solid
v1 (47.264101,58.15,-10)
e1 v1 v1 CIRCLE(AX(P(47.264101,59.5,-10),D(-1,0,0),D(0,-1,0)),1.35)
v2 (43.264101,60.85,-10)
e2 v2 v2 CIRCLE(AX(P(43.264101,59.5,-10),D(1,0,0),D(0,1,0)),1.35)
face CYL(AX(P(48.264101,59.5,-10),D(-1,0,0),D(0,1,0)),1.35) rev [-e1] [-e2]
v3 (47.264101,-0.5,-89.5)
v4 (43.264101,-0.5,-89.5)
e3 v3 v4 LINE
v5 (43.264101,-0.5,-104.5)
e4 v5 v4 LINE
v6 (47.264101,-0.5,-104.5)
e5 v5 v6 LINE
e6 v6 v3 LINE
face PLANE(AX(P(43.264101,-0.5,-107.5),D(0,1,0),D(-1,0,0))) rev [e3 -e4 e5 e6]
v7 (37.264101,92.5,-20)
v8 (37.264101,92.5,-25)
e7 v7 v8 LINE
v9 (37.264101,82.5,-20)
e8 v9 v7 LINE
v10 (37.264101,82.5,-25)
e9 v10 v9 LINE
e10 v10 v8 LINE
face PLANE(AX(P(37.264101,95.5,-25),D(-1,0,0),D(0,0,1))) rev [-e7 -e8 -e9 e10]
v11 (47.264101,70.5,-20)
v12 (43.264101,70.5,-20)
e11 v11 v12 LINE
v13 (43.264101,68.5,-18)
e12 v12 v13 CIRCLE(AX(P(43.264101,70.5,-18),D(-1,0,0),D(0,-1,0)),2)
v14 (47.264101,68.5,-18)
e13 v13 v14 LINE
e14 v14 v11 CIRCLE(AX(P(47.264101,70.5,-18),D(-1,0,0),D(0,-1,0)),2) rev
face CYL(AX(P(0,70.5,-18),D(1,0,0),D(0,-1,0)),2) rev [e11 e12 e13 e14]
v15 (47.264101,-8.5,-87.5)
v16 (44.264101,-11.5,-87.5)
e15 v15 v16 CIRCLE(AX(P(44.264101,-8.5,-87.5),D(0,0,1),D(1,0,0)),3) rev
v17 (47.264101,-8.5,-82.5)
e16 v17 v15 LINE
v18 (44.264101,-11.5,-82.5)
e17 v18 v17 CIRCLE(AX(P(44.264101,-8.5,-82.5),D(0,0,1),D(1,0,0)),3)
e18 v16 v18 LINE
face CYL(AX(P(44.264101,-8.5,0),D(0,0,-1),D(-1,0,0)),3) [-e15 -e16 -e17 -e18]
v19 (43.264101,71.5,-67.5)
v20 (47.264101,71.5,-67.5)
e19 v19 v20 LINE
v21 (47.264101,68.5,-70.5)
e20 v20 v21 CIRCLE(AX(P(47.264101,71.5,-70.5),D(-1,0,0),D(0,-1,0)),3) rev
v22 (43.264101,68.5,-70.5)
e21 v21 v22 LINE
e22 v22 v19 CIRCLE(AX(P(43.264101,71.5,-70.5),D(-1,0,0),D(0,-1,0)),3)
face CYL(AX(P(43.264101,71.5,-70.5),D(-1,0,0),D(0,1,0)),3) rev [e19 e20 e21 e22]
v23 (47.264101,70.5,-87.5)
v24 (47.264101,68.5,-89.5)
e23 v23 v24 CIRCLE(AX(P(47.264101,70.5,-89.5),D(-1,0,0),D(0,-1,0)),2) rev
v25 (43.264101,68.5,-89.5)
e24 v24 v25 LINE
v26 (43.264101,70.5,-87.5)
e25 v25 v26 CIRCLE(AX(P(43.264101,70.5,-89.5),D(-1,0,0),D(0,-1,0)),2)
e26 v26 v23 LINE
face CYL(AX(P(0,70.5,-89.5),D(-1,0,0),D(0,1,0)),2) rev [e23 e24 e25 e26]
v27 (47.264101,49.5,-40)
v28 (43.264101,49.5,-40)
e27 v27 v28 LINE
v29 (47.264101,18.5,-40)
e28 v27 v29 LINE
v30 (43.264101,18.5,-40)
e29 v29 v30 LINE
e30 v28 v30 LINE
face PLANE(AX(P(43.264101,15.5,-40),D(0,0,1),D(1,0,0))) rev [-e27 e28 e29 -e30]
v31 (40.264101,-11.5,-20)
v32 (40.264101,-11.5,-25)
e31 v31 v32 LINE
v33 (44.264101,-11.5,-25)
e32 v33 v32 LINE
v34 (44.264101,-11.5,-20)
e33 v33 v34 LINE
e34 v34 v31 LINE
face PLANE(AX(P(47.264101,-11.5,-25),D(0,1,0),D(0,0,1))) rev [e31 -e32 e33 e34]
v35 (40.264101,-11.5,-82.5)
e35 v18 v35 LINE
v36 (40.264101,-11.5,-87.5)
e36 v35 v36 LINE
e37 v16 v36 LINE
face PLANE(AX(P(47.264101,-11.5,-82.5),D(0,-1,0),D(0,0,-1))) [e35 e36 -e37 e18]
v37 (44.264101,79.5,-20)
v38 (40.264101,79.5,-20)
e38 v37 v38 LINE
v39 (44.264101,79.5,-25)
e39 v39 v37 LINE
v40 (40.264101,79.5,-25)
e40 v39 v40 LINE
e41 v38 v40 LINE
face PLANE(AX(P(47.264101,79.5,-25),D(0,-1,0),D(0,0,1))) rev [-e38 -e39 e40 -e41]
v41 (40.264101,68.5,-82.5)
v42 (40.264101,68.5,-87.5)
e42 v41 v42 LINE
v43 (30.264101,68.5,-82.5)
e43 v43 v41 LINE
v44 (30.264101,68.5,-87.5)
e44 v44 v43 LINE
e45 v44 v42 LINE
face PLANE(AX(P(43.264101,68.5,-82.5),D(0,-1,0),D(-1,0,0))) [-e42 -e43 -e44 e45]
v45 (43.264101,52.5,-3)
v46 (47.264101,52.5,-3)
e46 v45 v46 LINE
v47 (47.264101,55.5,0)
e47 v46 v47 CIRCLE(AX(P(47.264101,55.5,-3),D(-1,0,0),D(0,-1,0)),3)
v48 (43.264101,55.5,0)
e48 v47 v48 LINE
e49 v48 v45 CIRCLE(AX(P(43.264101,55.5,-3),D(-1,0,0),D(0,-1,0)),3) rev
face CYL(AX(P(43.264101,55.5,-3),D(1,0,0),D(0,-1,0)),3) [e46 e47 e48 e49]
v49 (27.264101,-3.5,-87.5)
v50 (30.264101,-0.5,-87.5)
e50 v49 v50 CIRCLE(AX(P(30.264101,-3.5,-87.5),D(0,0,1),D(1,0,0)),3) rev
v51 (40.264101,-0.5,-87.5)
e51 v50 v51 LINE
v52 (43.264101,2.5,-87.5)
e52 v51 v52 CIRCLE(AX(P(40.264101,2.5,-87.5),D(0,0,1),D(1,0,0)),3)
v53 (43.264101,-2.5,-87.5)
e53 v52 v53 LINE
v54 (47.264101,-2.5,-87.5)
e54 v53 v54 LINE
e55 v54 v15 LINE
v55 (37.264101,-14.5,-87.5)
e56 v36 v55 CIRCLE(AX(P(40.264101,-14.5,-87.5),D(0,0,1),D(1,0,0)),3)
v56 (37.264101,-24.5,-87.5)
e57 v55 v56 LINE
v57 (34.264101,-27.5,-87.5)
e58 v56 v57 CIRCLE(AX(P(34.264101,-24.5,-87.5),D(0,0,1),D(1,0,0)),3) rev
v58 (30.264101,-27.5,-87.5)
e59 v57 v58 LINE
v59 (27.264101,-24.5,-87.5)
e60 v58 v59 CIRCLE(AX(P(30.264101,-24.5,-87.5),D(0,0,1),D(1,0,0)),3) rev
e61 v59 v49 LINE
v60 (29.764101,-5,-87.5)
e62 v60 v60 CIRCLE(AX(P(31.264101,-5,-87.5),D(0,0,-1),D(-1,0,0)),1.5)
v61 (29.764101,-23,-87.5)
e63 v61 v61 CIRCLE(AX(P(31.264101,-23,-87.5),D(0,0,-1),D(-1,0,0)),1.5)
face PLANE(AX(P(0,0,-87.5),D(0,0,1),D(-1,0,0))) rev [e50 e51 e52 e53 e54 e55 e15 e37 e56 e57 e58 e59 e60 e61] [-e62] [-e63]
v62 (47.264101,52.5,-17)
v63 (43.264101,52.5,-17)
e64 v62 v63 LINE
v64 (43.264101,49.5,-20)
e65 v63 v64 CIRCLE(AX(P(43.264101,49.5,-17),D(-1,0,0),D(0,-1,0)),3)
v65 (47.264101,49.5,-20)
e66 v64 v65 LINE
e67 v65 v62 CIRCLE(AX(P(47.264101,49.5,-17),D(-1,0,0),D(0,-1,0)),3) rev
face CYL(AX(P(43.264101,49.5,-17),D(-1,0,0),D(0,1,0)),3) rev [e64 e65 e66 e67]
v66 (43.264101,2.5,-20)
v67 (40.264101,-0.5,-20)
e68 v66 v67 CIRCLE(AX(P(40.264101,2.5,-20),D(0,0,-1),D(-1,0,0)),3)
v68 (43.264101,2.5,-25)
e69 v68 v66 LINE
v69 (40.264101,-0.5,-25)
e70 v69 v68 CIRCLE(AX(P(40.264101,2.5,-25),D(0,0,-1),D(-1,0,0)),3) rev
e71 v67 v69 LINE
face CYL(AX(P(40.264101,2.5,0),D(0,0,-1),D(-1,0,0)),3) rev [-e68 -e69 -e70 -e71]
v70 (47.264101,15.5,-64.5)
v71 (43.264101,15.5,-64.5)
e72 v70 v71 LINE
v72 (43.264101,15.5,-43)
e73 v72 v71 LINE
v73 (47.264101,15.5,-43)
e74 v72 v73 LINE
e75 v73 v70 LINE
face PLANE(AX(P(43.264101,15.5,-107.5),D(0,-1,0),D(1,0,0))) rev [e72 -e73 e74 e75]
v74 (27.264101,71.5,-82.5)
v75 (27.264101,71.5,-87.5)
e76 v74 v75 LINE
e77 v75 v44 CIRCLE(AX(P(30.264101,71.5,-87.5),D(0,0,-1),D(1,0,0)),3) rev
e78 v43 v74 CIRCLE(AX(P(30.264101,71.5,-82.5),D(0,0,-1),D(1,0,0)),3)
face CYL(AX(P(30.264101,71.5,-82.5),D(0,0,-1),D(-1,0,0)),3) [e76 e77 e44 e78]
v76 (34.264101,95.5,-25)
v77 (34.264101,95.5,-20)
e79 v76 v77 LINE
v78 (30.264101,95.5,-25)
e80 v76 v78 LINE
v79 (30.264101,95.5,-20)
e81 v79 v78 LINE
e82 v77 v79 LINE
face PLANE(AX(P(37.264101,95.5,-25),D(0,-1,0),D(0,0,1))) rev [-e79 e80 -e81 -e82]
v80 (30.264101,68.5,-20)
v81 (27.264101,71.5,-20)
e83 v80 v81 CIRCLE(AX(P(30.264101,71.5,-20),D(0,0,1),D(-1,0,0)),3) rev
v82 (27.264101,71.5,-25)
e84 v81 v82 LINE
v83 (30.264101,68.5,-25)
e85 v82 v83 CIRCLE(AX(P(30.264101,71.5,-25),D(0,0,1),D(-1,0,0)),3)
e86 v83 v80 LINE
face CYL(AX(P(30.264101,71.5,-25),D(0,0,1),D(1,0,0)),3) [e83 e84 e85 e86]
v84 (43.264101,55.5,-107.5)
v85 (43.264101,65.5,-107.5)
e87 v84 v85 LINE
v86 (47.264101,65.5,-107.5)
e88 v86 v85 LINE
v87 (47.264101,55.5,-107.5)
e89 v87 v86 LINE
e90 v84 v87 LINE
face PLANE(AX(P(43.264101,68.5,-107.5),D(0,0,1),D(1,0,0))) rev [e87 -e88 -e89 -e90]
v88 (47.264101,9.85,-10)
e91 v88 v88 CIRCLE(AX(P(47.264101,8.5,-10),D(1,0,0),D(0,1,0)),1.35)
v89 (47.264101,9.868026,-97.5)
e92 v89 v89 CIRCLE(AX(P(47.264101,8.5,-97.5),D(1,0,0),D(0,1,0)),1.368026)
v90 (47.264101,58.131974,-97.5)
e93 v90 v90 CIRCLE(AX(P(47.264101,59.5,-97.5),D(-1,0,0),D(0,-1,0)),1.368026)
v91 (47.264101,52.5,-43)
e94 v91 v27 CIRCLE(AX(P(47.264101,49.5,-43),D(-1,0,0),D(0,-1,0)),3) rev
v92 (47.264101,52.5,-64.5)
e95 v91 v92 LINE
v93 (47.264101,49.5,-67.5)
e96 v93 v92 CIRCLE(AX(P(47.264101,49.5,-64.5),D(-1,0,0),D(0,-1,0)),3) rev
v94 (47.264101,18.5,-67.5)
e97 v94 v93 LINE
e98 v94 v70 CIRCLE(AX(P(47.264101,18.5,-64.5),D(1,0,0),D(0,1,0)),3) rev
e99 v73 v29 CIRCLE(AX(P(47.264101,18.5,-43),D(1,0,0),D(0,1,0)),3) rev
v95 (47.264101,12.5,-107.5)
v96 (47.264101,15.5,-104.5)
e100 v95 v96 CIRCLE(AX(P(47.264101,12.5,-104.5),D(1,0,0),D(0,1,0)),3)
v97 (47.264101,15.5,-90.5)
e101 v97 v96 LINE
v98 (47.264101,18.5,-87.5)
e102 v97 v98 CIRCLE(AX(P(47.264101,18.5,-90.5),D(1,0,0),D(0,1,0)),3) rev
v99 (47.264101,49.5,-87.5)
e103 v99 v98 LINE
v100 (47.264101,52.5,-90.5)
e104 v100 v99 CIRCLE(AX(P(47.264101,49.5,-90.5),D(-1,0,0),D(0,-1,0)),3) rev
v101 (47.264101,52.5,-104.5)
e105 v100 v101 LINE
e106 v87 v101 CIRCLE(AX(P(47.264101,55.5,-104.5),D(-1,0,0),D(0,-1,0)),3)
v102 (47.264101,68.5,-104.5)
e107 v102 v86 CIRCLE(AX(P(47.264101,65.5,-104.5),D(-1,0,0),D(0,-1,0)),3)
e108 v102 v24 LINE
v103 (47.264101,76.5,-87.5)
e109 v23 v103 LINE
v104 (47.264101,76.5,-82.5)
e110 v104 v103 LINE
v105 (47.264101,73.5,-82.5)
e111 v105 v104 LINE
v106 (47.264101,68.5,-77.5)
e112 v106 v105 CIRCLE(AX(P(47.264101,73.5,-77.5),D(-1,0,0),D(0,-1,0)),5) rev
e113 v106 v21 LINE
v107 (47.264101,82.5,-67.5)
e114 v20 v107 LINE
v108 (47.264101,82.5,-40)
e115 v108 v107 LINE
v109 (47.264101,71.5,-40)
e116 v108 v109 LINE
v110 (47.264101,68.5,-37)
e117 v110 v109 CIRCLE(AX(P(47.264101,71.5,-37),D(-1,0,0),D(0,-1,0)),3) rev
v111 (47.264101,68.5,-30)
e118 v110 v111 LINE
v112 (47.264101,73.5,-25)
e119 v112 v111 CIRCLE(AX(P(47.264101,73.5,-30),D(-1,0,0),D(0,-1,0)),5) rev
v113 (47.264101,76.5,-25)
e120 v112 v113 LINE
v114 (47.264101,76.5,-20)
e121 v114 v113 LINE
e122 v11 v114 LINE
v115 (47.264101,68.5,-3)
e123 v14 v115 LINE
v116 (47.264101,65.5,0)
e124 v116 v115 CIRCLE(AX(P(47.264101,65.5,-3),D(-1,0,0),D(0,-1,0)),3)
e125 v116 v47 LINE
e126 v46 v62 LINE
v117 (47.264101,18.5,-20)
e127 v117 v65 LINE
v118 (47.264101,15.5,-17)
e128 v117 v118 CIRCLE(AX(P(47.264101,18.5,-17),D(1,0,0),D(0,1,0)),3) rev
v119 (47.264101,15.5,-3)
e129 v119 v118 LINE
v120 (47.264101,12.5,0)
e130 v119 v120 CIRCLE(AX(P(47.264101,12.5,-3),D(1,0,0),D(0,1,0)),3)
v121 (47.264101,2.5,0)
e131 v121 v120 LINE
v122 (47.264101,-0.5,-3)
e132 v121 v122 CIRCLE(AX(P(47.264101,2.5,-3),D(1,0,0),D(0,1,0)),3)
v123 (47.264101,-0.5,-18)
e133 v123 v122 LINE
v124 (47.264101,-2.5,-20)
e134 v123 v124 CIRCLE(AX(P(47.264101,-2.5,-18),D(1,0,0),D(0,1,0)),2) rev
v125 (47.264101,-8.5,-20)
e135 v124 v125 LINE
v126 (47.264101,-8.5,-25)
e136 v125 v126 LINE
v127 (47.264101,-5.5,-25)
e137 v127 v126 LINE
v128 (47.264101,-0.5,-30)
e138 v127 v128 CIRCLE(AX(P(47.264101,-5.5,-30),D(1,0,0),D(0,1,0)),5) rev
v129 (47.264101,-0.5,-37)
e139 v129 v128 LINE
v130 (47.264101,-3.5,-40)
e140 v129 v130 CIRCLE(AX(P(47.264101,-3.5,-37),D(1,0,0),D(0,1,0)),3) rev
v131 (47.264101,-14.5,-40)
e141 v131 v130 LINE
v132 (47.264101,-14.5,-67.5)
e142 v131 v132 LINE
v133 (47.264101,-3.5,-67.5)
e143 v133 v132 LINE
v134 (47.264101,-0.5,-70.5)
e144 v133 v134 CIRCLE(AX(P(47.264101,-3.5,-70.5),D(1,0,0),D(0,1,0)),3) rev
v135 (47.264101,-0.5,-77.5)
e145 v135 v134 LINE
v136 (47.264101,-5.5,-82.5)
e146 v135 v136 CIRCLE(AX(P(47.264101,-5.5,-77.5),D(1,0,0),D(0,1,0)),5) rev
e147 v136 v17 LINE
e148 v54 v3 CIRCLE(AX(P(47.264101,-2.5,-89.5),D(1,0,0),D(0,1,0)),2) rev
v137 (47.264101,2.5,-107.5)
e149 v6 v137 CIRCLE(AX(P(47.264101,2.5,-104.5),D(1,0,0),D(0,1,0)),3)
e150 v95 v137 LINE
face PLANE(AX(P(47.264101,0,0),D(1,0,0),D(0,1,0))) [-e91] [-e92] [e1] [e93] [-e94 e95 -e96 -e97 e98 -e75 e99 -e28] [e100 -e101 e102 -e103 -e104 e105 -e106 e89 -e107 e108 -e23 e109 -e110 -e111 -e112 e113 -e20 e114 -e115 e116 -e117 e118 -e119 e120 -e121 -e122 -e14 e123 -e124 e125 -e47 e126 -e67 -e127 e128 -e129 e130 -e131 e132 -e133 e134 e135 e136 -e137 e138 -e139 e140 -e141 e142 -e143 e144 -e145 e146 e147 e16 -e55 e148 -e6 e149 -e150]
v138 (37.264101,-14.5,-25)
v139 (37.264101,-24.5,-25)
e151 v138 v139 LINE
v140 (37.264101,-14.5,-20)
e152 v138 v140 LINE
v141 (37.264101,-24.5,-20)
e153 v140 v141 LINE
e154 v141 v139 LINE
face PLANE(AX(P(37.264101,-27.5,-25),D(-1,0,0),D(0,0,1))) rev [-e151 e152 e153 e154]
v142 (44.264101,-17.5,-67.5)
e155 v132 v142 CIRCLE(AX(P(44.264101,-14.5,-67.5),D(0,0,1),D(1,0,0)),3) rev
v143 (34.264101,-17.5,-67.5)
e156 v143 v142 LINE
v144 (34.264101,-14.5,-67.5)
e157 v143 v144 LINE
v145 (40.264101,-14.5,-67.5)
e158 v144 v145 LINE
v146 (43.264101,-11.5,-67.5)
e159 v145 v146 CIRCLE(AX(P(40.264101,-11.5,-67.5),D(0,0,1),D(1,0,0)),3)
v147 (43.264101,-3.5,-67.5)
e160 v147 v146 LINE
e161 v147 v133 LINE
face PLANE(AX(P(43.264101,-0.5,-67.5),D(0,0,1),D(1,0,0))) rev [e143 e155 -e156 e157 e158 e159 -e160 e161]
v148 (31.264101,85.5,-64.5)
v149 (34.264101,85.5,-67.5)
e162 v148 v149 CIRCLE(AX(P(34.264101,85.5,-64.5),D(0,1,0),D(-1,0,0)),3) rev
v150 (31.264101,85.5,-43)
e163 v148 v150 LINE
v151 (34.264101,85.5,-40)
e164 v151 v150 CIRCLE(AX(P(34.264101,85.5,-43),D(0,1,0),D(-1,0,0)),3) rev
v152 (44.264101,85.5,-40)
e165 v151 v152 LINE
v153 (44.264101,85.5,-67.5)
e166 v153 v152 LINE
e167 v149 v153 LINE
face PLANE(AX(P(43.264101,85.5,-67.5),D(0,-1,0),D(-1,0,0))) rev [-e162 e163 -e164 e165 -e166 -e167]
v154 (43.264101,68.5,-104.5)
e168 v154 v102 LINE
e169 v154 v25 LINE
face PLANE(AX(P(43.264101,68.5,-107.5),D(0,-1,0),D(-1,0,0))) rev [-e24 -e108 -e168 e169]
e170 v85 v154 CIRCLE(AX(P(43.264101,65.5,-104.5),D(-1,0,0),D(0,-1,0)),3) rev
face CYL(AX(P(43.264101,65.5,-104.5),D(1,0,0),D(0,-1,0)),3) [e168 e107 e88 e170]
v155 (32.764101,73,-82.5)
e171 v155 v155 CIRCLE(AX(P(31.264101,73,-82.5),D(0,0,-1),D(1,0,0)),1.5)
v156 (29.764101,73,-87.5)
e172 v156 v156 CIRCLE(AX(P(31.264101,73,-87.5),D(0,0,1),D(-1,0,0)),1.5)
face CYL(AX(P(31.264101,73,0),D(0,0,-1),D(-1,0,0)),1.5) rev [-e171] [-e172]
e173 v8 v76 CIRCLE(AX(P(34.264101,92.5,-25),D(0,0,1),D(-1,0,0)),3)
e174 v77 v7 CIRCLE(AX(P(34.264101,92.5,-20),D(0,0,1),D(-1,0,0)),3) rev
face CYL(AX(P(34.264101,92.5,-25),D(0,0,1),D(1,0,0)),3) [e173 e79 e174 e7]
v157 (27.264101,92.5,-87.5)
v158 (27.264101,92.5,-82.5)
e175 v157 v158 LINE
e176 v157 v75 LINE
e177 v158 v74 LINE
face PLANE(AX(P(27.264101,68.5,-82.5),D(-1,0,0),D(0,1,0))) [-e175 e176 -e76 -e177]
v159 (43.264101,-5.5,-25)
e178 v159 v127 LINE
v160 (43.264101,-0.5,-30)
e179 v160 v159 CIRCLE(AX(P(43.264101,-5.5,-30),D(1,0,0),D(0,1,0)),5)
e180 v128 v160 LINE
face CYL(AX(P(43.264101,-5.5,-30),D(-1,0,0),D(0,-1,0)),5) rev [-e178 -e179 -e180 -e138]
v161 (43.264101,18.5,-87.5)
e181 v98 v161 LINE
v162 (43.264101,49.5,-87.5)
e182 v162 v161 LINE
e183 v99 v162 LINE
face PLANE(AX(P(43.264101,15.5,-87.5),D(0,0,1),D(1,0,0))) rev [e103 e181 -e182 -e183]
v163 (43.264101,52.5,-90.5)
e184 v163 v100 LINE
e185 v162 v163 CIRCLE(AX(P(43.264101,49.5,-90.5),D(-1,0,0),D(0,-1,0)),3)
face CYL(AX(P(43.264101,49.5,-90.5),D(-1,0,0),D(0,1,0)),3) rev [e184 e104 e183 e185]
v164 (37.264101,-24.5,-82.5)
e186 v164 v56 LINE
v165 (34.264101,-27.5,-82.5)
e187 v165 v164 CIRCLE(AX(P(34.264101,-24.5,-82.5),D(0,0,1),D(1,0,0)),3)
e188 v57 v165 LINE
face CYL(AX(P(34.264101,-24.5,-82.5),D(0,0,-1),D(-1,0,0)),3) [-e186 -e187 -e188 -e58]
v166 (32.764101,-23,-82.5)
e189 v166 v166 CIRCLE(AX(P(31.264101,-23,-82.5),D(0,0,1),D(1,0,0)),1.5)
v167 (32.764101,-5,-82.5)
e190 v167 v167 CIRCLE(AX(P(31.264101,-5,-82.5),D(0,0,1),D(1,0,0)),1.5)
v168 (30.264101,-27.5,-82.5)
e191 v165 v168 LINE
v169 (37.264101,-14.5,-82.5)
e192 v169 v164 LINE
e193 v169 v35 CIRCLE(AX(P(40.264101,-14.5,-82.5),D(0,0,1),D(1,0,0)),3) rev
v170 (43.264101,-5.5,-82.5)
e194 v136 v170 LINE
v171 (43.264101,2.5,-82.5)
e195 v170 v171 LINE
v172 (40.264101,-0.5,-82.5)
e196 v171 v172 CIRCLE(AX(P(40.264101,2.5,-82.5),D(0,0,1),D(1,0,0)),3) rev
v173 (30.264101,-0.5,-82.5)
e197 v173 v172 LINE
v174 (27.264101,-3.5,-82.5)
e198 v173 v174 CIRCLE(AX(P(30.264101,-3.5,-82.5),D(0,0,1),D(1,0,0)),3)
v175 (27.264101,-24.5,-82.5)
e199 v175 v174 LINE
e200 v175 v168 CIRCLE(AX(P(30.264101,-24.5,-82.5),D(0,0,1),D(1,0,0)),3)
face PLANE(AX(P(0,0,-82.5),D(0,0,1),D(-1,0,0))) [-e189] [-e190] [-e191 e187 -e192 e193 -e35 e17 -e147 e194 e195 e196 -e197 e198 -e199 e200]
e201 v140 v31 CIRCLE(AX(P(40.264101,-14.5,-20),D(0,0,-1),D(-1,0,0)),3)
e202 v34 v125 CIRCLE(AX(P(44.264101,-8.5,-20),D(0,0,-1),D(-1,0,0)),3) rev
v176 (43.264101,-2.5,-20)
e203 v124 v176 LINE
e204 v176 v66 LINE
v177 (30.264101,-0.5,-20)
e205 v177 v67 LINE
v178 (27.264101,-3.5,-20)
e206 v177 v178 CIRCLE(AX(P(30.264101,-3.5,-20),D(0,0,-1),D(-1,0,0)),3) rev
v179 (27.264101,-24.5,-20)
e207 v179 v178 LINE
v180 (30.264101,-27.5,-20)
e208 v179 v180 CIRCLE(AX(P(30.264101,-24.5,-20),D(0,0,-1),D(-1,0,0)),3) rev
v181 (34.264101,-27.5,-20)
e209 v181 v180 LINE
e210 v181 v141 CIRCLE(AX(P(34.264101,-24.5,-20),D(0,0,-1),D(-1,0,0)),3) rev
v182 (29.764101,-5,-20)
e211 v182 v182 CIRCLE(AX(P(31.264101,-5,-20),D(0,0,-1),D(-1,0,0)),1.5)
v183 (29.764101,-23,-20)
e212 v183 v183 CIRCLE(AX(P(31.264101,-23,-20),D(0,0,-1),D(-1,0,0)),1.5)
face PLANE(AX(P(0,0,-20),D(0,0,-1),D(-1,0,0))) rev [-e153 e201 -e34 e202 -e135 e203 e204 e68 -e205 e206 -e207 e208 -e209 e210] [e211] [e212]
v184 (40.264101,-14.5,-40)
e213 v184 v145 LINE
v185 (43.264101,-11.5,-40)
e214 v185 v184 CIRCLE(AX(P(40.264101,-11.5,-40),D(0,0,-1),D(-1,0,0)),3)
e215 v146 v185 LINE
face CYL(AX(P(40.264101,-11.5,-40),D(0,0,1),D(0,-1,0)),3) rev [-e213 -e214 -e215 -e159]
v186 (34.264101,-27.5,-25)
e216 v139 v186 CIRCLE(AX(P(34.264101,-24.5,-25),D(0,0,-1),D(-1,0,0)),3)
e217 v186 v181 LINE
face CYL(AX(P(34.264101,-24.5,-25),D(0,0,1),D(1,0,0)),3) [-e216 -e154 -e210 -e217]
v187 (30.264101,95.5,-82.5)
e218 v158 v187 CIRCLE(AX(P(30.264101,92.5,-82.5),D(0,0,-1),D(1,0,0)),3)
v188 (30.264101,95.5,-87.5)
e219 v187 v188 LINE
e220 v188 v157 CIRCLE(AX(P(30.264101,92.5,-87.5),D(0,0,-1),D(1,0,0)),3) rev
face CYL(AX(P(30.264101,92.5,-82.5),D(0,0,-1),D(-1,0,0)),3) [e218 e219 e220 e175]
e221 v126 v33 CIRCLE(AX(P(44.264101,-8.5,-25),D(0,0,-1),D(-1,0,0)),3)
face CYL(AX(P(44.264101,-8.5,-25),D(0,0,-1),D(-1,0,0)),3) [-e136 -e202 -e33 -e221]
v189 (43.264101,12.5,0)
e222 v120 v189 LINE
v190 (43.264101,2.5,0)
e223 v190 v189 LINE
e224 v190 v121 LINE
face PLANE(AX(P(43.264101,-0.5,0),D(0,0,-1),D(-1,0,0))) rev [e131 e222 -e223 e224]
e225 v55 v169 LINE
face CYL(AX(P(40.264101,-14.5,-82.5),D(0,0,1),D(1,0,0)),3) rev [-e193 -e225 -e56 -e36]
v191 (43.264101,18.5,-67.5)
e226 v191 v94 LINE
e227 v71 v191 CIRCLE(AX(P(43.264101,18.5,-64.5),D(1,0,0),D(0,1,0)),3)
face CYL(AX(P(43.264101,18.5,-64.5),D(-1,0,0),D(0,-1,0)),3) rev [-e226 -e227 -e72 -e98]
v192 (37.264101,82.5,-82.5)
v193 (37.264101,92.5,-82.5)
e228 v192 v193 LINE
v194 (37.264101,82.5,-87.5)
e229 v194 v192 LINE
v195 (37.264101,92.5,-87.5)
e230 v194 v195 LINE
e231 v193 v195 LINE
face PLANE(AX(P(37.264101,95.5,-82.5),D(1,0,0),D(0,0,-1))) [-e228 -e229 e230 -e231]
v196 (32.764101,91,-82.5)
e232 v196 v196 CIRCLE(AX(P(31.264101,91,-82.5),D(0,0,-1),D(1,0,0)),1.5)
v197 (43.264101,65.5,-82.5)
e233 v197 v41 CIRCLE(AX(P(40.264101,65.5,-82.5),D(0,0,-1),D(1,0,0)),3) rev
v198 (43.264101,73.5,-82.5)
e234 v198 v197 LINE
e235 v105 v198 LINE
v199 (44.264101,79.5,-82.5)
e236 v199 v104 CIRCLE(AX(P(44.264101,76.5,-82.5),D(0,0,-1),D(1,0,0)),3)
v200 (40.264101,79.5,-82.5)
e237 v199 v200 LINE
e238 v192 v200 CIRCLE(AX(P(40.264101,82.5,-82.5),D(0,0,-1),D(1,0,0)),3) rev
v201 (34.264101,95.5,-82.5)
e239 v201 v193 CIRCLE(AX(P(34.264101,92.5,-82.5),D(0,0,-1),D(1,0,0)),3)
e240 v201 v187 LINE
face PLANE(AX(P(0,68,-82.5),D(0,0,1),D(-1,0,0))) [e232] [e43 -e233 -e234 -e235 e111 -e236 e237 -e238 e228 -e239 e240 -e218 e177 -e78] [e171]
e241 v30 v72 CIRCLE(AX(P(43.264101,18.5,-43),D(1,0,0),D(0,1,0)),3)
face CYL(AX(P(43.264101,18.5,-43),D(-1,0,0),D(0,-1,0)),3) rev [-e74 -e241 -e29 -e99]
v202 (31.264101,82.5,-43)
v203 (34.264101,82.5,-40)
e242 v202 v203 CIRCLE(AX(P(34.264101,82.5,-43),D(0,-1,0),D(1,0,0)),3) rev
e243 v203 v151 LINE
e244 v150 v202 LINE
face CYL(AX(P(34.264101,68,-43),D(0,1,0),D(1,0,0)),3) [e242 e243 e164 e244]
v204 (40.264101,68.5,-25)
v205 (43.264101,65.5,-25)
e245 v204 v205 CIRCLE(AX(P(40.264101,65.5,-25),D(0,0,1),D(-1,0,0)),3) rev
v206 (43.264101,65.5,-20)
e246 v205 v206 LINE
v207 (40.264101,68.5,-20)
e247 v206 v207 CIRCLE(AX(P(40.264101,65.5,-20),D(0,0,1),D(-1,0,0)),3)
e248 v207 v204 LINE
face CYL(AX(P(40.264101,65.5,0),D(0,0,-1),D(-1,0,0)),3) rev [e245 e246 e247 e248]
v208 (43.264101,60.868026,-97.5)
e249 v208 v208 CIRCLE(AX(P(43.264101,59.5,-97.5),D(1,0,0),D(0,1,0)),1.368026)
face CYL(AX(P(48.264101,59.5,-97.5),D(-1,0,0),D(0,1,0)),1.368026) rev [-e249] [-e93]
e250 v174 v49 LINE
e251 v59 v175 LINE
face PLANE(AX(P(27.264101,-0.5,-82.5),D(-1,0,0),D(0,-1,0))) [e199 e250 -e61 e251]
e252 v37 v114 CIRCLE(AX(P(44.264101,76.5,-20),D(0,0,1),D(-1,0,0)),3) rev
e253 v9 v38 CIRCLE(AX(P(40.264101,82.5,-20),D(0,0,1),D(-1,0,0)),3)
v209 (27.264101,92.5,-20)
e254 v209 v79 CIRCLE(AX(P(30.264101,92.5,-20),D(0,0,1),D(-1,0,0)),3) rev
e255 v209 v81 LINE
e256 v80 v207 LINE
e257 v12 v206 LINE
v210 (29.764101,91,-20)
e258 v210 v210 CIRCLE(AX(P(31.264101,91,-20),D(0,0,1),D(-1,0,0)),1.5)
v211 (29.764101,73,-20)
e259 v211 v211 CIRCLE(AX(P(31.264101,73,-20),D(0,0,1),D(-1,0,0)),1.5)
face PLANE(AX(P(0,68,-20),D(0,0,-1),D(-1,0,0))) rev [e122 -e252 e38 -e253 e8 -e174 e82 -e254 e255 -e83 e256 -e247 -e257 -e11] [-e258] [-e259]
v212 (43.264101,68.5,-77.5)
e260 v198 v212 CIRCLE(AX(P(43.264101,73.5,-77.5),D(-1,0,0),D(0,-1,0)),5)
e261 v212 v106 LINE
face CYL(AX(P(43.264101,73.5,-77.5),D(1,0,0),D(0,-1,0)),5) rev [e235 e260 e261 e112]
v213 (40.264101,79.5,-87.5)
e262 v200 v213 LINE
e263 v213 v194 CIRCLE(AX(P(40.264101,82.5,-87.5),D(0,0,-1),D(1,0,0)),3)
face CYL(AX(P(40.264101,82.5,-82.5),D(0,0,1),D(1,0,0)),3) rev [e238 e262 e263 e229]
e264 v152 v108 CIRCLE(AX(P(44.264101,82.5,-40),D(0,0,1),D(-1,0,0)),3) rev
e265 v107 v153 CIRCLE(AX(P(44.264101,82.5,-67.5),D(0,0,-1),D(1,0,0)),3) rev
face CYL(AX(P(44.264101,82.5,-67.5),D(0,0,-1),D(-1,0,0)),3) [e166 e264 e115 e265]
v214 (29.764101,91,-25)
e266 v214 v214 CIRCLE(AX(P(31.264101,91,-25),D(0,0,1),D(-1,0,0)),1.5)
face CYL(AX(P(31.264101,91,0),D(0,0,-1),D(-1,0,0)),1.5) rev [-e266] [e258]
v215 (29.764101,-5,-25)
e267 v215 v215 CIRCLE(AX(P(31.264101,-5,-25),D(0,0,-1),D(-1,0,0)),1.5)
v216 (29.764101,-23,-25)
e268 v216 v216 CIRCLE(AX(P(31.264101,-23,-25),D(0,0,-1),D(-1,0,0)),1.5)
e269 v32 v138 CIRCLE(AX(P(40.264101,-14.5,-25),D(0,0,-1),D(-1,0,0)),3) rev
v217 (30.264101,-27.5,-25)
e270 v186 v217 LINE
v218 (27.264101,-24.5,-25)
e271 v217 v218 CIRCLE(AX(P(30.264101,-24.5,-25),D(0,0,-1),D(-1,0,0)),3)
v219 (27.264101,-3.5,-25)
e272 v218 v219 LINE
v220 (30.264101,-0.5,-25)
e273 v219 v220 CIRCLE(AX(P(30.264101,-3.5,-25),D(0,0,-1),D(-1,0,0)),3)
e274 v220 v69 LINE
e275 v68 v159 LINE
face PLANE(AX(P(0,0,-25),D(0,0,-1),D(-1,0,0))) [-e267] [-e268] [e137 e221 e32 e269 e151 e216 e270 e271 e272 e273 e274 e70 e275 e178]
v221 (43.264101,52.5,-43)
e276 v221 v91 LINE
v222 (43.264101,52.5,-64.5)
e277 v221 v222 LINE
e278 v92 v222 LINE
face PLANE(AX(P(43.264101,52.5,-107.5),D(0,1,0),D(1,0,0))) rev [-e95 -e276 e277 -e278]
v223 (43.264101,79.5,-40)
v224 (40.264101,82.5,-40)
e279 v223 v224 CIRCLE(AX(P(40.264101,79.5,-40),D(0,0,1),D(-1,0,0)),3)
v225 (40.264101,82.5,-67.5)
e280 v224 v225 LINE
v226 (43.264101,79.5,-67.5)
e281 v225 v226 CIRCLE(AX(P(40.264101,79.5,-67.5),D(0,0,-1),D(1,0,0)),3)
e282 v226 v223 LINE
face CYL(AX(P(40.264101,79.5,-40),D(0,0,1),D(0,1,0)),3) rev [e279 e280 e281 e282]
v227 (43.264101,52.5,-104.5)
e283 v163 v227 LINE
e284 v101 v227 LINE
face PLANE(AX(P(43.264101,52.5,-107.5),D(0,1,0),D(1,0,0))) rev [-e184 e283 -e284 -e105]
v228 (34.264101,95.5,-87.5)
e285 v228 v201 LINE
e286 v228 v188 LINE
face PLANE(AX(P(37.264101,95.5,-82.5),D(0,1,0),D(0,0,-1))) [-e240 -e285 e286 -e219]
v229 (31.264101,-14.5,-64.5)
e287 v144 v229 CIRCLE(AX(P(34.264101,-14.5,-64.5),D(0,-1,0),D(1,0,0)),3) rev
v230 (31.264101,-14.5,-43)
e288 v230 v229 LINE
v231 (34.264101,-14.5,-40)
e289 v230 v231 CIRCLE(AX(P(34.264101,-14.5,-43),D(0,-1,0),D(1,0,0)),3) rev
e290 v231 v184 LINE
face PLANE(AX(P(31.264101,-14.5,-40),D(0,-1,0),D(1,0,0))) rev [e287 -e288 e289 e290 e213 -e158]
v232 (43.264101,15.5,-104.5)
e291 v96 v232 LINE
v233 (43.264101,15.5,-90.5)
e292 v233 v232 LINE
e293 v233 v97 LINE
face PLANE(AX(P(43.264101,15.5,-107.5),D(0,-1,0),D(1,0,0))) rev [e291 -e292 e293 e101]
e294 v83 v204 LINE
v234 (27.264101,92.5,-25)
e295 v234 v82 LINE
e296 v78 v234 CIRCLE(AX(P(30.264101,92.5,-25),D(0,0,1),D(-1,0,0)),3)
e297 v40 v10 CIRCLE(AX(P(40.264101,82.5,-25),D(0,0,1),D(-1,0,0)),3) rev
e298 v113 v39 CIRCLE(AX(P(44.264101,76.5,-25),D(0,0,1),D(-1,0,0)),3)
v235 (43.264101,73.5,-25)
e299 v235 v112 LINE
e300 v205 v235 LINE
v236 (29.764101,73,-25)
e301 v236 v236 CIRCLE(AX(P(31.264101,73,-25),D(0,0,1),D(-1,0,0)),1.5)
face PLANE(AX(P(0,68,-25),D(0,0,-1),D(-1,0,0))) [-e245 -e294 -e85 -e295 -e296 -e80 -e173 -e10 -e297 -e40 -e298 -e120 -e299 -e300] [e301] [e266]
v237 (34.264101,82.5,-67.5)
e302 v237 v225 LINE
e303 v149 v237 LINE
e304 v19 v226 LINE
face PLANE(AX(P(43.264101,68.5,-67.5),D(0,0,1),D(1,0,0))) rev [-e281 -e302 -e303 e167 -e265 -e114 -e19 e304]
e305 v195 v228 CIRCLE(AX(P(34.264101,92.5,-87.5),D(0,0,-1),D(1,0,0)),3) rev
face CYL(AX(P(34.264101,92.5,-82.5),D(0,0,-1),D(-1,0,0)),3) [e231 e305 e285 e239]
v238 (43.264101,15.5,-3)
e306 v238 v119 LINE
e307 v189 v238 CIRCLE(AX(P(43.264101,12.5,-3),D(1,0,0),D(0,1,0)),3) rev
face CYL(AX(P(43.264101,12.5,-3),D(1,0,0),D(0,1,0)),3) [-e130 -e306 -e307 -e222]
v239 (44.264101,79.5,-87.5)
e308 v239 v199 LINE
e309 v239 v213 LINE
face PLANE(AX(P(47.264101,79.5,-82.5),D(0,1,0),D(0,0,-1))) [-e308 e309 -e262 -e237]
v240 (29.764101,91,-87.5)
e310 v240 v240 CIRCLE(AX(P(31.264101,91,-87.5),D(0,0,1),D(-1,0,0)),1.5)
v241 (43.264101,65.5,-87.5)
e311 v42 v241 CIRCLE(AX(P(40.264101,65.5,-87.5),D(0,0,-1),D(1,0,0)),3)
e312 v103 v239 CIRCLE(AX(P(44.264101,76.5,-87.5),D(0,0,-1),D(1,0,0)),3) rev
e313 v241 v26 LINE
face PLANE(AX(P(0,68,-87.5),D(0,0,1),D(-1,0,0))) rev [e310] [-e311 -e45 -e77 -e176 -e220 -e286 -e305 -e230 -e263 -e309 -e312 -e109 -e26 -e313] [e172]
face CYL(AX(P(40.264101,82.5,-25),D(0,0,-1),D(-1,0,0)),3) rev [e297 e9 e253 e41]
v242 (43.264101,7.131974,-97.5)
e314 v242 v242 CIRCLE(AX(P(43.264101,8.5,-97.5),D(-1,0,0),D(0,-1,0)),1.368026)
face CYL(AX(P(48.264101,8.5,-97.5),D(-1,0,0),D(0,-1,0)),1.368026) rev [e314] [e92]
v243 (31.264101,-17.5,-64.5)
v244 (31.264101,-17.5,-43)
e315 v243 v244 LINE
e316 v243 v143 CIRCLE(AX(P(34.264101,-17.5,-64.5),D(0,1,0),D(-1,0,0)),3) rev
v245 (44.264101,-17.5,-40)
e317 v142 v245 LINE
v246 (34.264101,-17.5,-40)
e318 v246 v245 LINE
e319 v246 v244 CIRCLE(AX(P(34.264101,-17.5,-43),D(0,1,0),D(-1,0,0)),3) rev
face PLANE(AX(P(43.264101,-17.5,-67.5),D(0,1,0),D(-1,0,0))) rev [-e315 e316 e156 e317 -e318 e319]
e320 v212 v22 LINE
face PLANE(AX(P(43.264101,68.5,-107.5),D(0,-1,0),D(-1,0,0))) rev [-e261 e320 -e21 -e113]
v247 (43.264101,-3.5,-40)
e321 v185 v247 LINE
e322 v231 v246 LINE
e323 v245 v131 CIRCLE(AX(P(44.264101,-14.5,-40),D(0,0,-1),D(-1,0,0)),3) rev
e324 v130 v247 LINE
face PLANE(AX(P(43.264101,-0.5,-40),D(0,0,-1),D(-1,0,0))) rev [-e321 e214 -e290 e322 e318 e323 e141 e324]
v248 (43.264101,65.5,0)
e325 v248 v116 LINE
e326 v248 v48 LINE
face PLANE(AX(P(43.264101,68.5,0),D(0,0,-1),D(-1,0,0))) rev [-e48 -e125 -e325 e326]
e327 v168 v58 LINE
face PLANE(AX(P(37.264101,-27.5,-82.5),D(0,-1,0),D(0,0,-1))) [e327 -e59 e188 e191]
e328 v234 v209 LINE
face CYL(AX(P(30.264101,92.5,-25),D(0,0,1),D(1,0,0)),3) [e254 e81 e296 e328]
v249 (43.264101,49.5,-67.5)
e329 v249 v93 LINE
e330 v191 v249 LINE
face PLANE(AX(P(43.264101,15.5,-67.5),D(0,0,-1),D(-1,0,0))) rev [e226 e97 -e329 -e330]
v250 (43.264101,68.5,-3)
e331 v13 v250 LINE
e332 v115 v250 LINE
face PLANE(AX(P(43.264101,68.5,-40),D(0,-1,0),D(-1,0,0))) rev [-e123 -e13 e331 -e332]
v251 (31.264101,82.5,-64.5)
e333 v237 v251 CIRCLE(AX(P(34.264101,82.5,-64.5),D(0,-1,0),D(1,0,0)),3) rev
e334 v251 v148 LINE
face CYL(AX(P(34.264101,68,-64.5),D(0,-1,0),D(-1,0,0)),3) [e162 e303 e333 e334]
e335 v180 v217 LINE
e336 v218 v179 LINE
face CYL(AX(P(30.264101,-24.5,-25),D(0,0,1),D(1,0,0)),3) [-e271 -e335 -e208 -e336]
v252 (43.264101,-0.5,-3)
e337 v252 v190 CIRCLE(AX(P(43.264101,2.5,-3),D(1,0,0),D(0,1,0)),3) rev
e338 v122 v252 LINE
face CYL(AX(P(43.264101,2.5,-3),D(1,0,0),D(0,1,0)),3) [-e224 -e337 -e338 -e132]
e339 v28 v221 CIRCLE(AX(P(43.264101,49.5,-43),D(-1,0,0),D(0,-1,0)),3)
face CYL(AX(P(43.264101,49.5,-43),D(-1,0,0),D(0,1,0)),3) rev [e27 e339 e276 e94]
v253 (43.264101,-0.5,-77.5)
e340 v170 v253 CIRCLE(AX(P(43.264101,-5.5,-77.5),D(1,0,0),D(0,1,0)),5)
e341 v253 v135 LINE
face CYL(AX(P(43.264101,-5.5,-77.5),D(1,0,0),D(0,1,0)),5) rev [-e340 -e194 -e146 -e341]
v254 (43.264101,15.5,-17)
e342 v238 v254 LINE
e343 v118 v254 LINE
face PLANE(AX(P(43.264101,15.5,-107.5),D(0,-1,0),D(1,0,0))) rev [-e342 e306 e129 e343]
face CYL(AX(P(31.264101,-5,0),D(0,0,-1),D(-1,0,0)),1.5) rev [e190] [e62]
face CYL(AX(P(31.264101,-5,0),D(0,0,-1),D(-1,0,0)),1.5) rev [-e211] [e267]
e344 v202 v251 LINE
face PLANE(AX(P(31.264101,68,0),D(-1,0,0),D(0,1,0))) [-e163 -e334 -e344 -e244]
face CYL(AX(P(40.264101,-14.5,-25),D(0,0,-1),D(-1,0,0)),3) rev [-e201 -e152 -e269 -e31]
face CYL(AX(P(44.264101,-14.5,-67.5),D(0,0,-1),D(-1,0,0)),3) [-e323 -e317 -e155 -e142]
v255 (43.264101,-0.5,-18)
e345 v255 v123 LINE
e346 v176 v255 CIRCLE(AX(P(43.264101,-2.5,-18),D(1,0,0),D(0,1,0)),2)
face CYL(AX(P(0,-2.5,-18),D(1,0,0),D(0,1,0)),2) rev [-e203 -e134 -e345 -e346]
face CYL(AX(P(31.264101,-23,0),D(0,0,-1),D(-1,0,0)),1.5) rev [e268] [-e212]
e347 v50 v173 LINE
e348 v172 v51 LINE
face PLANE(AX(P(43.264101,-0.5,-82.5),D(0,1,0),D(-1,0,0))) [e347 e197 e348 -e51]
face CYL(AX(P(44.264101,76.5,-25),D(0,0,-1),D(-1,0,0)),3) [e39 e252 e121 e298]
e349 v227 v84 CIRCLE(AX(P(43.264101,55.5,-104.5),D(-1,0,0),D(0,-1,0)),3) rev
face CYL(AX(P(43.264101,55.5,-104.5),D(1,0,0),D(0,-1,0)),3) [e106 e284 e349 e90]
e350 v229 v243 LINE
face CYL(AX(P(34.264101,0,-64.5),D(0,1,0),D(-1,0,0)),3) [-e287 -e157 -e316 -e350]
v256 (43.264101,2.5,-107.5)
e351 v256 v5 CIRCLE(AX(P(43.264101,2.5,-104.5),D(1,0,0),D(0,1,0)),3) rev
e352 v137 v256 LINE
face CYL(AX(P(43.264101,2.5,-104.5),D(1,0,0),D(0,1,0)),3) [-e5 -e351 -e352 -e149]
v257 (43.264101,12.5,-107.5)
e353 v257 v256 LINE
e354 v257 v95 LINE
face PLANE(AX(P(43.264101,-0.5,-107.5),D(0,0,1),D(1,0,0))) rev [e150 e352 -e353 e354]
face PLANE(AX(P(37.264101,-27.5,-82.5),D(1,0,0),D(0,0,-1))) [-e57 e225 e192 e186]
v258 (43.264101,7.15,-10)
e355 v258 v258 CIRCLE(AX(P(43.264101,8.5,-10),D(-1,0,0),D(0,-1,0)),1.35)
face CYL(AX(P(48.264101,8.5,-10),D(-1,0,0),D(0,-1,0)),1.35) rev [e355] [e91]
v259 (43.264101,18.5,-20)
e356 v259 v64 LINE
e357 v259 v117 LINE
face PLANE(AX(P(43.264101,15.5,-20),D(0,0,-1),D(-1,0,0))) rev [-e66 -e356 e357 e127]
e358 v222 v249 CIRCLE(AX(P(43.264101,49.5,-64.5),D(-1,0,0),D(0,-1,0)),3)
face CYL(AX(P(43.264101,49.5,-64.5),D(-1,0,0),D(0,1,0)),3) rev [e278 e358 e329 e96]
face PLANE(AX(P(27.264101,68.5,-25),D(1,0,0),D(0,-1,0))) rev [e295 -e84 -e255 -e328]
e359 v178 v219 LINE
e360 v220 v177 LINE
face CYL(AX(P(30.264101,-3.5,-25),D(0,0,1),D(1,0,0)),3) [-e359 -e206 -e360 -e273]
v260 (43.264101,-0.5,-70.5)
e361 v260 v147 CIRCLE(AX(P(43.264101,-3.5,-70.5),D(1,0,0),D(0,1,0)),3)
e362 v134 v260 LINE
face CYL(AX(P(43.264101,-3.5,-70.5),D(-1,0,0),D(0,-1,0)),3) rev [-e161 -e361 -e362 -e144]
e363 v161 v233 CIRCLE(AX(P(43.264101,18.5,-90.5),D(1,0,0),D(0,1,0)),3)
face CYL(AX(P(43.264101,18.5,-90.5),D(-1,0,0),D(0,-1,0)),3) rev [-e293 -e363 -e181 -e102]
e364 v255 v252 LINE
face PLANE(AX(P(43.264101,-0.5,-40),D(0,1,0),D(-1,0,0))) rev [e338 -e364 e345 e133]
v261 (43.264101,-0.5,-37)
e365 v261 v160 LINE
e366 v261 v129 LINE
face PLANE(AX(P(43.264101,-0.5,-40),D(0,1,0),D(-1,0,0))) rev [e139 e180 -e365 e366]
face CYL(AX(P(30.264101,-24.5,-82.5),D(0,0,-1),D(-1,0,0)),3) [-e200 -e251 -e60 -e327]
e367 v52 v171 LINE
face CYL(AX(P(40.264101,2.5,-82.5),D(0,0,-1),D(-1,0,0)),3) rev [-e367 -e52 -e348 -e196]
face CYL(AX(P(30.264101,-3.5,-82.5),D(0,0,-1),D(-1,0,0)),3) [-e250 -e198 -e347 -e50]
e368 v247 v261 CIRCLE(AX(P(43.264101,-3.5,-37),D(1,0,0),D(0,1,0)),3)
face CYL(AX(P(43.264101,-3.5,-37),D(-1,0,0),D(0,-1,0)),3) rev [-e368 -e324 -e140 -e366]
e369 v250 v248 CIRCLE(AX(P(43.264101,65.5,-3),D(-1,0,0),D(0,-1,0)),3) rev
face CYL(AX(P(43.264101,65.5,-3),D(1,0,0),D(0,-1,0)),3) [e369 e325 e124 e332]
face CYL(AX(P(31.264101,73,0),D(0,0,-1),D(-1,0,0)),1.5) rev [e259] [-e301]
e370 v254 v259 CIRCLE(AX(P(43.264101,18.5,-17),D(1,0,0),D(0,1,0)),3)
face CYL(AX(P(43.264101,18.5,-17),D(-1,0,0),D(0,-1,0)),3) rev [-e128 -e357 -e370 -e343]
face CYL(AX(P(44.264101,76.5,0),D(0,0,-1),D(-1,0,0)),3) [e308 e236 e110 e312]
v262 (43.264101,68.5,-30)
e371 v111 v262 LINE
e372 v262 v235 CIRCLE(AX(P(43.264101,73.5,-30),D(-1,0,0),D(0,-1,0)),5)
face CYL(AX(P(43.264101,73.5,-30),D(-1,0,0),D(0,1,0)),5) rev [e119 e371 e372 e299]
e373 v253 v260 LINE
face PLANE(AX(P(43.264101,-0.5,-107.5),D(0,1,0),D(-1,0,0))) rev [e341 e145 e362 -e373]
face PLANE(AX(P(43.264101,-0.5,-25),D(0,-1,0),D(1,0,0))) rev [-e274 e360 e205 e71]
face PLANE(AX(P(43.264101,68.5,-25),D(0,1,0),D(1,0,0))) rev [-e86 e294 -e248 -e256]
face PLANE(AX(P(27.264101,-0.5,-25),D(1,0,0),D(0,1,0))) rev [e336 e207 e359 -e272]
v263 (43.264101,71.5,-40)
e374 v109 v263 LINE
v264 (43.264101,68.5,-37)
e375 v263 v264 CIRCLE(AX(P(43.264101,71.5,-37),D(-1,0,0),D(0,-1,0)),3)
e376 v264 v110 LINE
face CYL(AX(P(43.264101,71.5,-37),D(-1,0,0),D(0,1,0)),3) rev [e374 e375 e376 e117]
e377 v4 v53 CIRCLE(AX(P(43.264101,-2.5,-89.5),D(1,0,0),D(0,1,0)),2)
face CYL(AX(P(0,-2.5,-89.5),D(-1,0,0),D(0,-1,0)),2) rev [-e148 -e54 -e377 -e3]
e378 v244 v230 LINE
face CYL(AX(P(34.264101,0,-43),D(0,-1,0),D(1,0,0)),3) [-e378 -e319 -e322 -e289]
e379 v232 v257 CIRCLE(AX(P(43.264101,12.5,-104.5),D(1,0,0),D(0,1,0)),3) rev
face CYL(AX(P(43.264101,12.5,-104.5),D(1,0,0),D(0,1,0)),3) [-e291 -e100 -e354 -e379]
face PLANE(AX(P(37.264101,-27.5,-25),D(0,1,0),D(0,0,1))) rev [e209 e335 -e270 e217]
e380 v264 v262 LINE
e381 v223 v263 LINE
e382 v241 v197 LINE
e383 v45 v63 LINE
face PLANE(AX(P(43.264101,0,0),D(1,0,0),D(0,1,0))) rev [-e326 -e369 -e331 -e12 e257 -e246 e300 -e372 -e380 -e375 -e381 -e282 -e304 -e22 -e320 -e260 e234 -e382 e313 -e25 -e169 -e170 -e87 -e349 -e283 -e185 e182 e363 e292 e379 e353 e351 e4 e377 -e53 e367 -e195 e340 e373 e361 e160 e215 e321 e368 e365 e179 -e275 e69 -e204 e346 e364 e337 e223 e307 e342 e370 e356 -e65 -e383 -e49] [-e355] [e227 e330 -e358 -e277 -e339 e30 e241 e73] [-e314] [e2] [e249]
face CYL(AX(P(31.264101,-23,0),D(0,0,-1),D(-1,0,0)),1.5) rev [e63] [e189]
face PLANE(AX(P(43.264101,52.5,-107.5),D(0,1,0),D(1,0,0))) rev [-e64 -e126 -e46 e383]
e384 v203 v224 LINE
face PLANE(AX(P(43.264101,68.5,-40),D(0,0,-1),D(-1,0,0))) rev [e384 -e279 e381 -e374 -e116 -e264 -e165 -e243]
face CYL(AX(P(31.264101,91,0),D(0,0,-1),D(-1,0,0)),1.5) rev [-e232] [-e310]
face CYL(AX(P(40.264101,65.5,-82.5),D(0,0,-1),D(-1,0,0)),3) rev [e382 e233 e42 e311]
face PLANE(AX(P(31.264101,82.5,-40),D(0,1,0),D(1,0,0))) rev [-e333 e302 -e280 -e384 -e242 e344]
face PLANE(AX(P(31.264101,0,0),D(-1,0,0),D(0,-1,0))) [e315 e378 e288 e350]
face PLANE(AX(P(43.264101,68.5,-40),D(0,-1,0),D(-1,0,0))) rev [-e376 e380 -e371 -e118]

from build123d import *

# Parameters (mm, degrees)
BOSS_EXTRUDE4_DEPTH = 4
BOSS_EXTRUDE5_DEPTH = 5
FILLET5_R           = 5
FILLET6_R           = 2
FILLET7_R           = 3
SKETCH11_R          = 1.5
CUT_EXTRUDE6_DEPTH  = 104.181370521
SKETCH12_R          = 1.368026344
SKETCH12_R_2        = 1.35
CUT_EXTRUDE7_DEPTH  = 5
FILLET8_R           = 3
SKETCH13_W          = 27.5
SKETCH13_H          = 3
BOSS_EXTRUDE6_DEPTH = 12
FILLET9_R           = 3
SKETCH14_W          = 20
SKETCH14_H          = 18.5
BOSS_EXTRUDE7_DEPTH = 4
FILLET10_R          = 3


with BuildPart() as part:
    # Sketch9 → Boss-Extrude4 (new body)
    with BuildSketch(Plane.ZY.offset(-47.264100781)):
        Polygon((-107.5, -0.5), (-67.5, -0.5), (-67.5, -17.5), (-40, -17.5), (-40, -0.5), (0, -0.5), (0, 15.5), (-107.5, 15.5), align=None)
    extrude(amount=BOSS_EXTRUDE4_DEPTH)

    # Sketch10 → Boss-Extrude5 (add)
    with BuildSketch(Plane(origin=(0, 0, -20), x_dir=(-1, 0, 0), z_dir=(0, 0, -1))):
        Polygon((-43.264100781, -0.5), (-27.264100781, -0.5), (-27.264100781, -27.5), (-37.264100781, -27.5), (-37.264100781, -11.5), (-47.264100781, -11.5), (-47.264100781, 7.5), (-43.264100781, 7.5), align=None)
    boss_extrude5 = extrude(amount=BOSS_EXTRUDE5_DEPTH)

    # Mirror1: Boss-Extrude5 across plane
    add(boss_extrude5.mirror(Plane.XY.offset(-53.75)))

    # Fillet5
    fillet5_edges = [part.edges().sort_by_distance(p)[0] for p in [
        (45.264100781, -0.5, -82.5),
        (45.264100781, -0.5, -25),
    ]]
    fillet(fillet5_edges, radius=FILLET5_R)

    # Fillet6
    fillet6_edges = [part.edges().sort_by_distance(p)[0] for p in [
        (45.264100781, -0.5, -87.5),
        (45.264100781, -0.5, -20),
    ]]
    fillet(fillet6_edges, radius=FILLET6_R)

    # Fillet7
    fillet7_edges = [part.edges().sort_by_distance(p)[0] for p in [
        (43.264100781, -0.5, -85),
        (37.264100781, -11.5, -85),
        (37.264100781, -11.5, -22.5),
        (43.264100781, -0.5, -22.5),
    ]]
    fillet(fillet7_edges, radius=FILLET7_R)
    fillet7_2_edges = [part.edges().sort_by_distance(p)[0] for p in [
        (45.264100781, 15.5, -107.5),
        (45.264100781, -0.5, -107.5),
        (45.264100781, 15.5, 0),
        (47.264100781, -11.5, -85),
        (27.264100781, -0.5, -85),
        (37.264100781, -27.5, -85),
        (27.264100781, -27.5, -85),
        (47.264100781, -11.5, -22.5),
        (27.264100781, -0.5, -22.5),
        (37.264100781, -27.5, -22.5),
        (27.264100781, -27.5, -22.5),
        (45.264100781, -0.5, 0),
    ]]
    fillet(fillet7_2_edges, radius=FILLET7_R)

    # Sketch11 → Cut-Extrude6 (cut, through all)
    with BuildSketch(Plane(origin=(0, 0, -87.5), x_dir=(-1, 0, 0), z_dir=(0, 0, -1))):
        with Locations((-31.264100781, -5)):
            Circle(SKETCH11_R)
        with Locations((-31.264100781, -23)):
            Circle(SKETCH11_R)
    extrude(amount=-CUT_EXTRUDE6_DEPTH, mode=Mode.SUBTRACT)

    # Sketch12 → Cut-Extrude7 (cut)
    with BuildSketch(Plane.ZY.offset(-43.264100781)):
        with Locations((-97.5, 8.5)):
            Circle(SKETCH12_R)
        with Locations((-10, 8.5)):
            Circle(SKETCH12_R_2)
    extrude(amount=-CUT_EXTRUDE7_DEPTH, mode=Mode.SUBTRACT)

    # Fillet8
    fillet8_edges = [part.edges().sort_by_distance(p)[0] for p in [
        (45.264100781, -0.5, -67.5),
        (45.264100781, -0.5, -40),
    ]]
    fillet(fillet8_edges, radius=FILLET8_R)

    # Sketch13 → Boss-Extrude6 (add)
    with BuildSketch(Plane.ZY.offset(-43.264100781)):
        with Locations((-53.75, -16)):
            Rectangle(SKETCH13_W, SKETCH13_H)
    extrude(amount=BOSS_EXTRUDE6_DEPTH)

    # Fillet9
    fillet9_edges = [part.edges().sort_by_distance(p)[0] for p in [
        (31.264100781, -16, -40),
        (31.264100781, -16, -67.5),
        (43.264100781, -14.5, -53.75),
        (47.264100781, -17.5, -53.75),
    ]]
    fillet(fillet9_edges, radius=FILLET9_R)

    # Sketch14 → Boss-Extrude7 (add)
    with BuildSketch(Plane.ZY.offset(-47.264100781)):
        with Locations((-30, 24.75)):
            Rectangle(SKETCH14_W, SKETCH14_H)
        with Locations((-77.5, 24.75)):
            Rectangle(SKETCH14_W, SKETCH14_H)
    extrude(amount=BOSS_EXTRUDE7_DEPTH)

    # Fillet10
    fillet10_edges = [part.edges().sort_by_distance(p)[0] for p in [
        (45.264100781, 15.5, -20),
        (45.264100781, 15.5, -40),
        (45.264100781, 15.5, -67.5),
        (45.264100781, 15.5, -87.5),
    ]]
    fillet(fillet10_edges, radius=FILLET10_R)

    # Mirror2: part across plane


with BuildPart() as part_1:
    add(part.part)
    add(part.part.mirror(Plane(origin=(43.264100781, 34, -20), x_dir=(0, 0, 1), z_dir=(0, -1, 0))))


solid = part_1.part
